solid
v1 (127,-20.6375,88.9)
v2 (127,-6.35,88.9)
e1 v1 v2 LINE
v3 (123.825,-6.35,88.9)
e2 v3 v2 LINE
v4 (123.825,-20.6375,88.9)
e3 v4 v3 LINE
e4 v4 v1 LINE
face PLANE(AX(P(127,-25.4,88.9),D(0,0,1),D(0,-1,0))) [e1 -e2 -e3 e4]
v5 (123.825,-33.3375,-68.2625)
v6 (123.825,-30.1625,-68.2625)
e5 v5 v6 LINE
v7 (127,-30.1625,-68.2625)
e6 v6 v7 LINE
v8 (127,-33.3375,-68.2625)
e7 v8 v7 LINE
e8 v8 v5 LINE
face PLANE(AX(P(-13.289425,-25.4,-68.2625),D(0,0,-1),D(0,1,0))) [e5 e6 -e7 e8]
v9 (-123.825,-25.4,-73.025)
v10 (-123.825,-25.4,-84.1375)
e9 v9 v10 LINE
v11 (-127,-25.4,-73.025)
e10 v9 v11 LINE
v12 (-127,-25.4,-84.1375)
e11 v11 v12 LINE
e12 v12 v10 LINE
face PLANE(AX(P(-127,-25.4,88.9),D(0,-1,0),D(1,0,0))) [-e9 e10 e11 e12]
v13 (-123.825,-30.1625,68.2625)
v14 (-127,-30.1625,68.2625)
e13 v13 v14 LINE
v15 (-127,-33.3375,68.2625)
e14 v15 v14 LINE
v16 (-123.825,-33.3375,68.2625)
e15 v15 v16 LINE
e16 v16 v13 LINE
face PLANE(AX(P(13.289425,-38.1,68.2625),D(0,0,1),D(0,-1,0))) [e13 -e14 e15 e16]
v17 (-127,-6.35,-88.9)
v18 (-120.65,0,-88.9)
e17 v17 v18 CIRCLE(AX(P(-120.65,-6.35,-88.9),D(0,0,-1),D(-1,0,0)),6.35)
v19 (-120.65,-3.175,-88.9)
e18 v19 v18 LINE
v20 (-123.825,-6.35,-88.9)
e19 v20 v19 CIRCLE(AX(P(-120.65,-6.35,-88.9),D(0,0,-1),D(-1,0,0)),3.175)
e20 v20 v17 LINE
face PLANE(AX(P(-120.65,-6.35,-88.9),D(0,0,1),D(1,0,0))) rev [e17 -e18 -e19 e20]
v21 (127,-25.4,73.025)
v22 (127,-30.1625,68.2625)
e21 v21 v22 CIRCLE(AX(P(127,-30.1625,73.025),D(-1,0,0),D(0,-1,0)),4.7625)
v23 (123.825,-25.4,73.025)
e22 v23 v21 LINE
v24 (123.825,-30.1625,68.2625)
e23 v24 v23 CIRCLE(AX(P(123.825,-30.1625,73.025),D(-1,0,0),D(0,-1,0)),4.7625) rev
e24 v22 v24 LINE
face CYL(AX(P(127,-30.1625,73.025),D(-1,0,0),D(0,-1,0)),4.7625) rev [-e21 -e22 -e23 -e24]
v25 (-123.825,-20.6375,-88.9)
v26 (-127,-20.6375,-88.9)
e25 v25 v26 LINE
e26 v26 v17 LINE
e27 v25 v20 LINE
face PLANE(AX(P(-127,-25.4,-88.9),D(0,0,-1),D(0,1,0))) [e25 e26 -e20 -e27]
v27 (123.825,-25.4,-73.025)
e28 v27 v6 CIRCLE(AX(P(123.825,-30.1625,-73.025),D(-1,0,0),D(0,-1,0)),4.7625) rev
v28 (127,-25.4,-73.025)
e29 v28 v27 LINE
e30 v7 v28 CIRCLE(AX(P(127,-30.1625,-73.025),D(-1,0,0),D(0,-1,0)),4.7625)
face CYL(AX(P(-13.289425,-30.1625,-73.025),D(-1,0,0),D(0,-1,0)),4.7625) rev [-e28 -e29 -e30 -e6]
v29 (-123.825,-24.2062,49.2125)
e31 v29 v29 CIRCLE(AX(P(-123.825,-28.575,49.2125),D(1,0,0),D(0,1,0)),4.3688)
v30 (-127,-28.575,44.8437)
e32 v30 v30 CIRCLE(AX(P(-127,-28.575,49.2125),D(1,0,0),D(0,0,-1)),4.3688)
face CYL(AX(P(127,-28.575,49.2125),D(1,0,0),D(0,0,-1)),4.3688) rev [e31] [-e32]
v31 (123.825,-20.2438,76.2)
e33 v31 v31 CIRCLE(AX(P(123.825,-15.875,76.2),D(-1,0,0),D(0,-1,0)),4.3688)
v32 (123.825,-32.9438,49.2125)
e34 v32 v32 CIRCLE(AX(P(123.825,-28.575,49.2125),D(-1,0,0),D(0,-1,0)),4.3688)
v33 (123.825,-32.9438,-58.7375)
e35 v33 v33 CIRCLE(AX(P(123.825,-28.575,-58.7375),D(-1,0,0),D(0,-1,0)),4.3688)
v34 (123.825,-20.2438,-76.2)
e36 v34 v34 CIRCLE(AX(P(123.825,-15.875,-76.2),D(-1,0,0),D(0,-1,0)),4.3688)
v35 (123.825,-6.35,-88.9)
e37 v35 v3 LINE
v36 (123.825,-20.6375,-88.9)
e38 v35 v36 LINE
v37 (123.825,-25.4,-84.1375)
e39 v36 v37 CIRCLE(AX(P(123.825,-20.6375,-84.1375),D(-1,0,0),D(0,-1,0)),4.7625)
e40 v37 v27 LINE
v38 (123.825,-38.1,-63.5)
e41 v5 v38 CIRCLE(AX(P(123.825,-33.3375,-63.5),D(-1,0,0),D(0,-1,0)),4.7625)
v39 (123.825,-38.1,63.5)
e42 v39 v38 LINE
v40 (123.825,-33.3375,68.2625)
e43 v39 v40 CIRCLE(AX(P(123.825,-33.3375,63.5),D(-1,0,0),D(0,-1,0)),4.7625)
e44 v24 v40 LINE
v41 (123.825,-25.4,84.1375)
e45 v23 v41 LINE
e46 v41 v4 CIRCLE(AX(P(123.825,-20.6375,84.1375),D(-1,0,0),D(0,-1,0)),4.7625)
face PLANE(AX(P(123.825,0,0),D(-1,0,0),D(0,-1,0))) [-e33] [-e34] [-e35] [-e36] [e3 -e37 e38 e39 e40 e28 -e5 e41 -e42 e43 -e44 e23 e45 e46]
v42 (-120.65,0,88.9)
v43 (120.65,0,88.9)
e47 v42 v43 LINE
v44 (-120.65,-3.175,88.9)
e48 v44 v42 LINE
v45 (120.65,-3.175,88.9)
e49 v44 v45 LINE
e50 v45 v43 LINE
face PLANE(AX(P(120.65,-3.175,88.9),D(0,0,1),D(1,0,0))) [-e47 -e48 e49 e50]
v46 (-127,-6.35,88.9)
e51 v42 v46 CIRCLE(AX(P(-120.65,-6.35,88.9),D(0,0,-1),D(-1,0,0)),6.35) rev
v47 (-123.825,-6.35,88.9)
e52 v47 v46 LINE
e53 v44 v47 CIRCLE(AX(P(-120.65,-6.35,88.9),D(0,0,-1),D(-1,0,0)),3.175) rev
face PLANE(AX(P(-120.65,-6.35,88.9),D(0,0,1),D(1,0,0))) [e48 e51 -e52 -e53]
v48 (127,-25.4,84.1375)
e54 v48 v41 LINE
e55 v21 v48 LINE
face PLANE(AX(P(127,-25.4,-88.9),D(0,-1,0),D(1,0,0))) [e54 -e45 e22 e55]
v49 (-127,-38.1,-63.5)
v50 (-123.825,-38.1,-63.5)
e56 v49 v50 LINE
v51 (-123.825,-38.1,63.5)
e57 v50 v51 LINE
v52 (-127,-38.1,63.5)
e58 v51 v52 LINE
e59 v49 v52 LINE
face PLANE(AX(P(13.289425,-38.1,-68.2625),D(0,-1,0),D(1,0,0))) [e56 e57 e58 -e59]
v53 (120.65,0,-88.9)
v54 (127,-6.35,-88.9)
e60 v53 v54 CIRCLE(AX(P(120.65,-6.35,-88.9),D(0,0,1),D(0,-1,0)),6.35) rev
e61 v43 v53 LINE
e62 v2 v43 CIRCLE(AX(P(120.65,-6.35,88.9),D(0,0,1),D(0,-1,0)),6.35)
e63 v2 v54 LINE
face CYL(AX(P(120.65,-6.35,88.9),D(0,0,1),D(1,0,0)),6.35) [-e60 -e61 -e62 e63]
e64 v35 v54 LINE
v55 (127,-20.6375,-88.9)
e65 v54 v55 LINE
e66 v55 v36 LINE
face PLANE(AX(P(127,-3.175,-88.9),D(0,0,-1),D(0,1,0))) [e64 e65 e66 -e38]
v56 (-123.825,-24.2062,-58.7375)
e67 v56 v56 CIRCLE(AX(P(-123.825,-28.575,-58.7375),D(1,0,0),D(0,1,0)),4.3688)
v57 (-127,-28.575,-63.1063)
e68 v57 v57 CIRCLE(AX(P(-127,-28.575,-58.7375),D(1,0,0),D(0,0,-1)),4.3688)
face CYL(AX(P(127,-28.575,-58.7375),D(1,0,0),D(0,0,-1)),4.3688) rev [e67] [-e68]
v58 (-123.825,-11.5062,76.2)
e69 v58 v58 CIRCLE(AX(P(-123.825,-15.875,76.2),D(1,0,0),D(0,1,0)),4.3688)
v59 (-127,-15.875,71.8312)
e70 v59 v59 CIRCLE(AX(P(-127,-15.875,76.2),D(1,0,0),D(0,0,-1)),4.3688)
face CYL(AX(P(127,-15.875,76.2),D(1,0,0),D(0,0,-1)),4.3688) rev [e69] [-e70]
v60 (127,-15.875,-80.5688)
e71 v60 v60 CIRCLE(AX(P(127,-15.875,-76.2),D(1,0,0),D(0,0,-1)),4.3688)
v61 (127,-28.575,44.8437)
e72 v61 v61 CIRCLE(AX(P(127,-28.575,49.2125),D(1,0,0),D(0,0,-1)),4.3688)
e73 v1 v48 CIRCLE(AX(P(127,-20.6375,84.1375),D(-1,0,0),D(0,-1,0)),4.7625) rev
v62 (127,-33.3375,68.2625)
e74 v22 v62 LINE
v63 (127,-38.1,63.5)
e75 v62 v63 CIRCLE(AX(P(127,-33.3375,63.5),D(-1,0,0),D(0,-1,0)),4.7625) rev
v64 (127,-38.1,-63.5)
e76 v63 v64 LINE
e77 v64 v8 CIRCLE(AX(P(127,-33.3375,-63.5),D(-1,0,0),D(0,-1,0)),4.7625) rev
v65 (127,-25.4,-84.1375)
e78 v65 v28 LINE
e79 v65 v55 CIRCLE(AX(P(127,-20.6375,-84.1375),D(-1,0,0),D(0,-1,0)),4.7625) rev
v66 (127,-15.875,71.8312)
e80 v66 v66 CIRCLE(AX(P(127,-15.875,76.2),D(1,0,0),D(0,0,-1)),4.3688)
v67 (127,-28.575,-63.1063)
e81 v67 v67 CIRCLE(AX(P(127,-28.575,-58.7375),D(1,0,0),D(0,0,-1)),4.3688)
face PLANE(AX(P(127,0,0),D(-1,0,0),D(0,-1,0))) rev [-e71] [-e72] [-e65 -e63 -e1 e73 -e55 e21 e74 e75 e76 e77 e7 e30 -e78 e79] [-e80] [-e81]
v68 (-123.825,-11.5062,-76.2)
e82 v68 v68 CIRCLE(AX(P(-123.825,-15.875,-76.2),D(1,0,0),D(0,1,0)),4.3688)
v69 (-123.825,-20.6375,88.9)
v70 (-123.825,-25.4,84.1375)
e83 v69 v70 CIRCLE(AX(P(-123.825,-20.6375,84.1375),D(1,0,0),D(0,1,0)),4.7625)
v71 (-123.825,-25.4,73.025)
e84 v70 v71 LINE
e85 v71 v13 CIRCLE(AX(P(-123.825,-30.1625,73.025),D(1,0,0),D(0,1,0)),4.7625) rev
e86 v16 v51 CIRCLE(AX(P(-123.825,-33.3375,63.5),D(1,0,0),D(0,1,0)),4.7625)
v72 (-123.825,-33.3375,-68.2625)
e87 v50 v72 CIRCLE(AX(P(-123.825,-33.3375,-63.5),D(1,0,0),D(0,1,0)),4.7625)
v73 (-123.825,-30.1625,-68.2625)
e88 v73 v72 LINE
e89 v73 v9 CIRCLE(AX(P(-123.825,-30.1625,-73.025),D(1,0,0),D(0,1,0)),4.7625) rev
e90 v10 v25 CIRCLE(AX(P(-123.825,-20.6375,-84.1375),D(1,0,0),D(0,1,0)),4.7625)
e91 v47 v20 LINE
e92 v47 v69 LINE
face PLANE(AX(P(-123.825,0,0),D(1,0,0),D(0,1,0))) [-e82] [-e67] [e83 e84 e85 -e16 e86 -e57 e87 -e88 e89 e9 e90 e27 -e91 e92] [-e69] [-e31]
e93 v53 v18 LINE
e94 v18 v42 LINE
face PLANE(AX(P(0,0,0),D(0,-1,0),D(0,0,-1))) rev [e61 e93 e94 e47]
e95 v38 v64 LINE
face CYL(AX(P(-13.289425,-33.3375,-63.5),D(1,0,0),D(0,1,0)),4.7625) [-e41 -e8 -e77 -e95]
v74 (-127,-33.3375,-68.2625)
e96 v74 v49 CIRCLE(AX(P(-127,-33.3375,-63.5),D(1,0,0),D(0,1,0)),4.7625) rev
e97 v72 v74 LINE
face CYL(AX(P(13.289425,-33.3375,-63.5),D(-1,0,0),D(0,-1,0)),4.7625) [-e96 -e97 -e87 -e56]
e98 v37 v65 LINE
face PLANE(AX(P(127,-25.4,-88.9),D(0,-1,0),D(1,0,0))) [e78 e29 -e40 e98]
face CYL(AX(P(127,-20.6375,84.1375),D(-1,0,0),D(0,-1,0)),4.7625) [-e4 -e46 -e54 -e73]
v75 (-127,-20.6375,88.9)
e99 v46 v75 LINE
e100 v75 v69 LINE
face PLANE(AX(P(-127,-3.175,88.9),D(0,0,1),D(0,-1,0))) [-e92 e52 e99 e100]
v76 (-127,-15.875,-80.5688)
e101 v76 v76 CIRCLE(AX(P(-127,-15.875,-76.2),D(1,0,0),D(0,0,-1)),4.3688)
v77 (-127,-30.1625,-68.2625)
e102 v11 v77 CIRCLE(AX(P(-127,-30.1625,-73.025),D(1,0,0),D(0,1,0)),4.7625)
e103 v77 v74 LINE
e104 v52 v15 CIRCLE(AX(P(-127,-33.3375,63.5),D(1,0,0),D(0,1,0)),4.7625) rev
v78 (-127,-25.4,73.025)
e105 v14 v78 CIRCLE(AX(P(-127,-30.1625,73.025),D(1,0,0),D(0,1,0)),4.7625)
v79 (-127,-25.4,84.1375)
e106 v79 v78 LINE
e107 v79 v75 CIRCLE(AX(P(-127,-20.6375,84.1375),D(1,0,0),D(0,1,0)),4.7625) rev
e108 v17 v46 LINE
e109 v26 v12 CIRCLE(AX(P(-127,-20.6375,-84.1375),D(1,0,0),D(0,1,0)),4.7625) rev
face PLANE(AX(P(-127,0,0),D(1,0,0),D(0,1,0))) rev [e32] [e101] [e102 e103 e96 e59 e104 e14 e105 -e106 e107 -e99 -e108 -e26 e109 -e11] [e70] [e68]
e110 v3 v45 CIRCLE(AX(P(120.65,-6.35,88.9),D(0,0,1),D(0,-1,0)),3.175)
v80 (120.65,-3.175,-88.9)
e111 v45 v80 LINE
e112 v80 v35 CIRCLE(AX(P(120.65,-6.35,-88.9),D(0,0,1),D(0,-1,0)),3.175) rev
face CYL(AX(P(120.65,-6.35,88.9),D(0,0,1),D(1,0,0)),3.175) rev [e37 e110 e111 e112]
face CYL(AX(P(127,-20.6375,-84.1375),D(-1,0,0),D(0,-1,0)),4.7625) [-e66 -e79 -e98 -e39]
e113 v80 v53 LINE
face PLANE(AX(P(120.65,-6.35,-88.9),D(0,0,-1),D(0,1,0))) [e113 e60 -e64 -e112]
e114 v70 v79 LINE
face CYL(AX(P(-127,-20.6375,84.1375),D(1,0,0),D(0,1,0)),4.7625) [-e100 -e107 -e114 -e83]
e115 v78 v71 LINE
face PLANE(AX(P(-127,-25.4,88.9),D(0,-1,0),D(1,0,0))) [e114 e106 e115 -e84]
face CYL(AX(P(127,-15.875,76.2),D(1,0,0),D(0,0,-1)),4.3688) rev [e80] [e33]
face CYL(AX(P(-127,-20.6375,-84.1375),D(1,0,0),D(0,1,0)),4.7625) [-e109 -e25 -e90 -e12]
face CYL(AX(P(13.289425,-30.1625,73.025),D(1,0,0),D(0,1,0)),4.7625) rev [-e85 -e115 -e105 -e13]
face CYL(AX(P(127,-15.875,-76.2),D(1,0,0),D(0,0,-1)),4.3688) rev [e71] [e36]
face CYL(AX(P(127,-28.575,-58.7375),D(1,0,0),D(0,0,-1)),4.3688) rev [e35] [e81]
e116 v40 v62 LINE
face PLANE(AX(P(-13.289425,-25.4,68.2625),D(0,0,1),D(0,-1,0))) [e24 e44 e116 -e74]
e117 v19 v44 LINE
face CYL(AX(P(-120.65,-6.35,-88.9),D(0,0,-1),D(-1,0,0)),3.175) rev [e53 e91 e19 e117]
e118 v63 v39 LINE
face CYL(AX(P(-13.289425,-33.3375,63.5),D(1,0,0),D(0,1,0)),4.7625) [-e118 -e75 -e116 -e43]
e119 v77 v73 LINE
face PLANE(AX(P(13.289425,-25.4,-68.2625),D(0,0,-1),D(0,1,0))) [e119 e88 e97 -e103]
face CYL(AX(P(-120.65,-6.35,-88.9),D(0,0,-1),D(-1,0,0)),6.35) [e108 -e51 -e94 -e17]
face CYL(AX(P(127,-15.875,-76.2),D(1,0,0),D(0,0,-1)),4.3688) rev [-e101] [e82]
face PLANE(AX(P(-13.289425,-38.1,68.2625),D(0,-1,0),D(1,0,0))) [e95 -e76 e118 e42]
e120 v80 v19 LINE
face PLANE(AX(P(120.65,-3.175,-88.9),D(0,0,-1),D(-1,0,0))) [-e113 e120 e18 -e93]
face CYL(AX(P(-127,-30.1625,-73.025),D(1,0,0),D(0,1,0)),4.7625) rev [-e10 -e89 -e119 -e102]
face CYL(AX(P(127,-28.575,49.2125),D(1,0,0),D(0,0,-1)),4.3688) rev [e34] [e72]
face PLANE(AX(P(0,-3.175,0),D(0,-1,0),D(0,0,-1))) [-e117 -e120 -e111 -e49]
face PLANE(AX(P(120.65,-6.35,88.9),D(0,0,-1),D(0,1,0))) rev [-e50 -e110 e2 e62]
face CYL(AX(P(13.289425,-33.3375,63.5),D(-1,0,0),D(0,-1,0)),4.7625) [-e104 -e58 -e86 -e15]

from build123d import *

# Parameters (mm, degrees)
SKETCH1_W                                 = 241.3
SKETCH1_H                                 = 177.8
BASE_FLANGE1_DEPTH                        = 3.175
EDGE_FLANGE1_DEPTH                        = 177.8
EDGE_FLANGE1_BEND_DEPTH                   = 177.8
SKETCH13_W                                = 136.525
SKETCH13_H                                = 12.7
BOSS_EXTRUDE1_DEPTH                       = 3.175
SKETCH39_W                                = 136.525
SKETCH39_H                                = 12.7
BOSS_EXTRUDE2_DEPTH                       = 3.175
HOLE_FOR_1_4_SELF_CLINCHING_NUTS_S_SS_C_D = 8.7376
FILLET2_R                                 = 4.7625


# Sheet-metal steps are written as plain solids
with BuildPart() as part:
    # Sketch1 → Base-Flange1 (new body)
    with BuildSketch(Plane(origin=(0, 0, 0), x_dir=(1, 0, 0), z_dir=(0, 1, 0))):
        Rectangle(SKETCH1_W, SKETCH1_H)
    extrude(amount=-BASE_FLANGE1_DEPTH)

    # Edge-Flange1 section (across the edge) → Edge-Flange1 (add)
    with BuildSketch(Plane(origin=(123.825, -3.175, -88.9), x_dir=(-1, 0, 0), z_dir=(0, 0, 1))):
        with BuildLine():
            Line((-3.175, 3.175), (-3.175, 22.225))
            Line((-3.175, 22.225), (0, 22.225))
            Line((0, 22.225), (0, 3.175))
            ThreePointArc((0, 3.175), (0.92993597, 0.92993597), (3.175, 0))
            Line((3.175, 0), (3.175, -3.175))
            ThreePointArc((3.175, -3.175), (-1.315128061, -1.315128061), (-3.175, 3.175))
        make_face()
    extrude(amount=EDGE_FLANGE1_DEPTH)

    # Edge-Flange1 section 2 (across the edge) → Edge-Flange1 bend (add)
    with BuildSketch(Plane(origin=(-123.825, -3.175, 88.9), x_dir=(1, 0, 0), z_dir=(0, 0, -1))):
        with BuildLine():
            Line((-3.175, 3.175), (-3.175, 22.225))
            Line((-3.175, 22.225), (0, 22.225))
            Line((0, 22.225), (0, 3.175))
            ThreePointArc((0, 3.175), (0.92993597, 0.92993597), (3.175, 0))
            Line((3.175, 0), (3.175, -3.175))
            ThreePointArc((3.175, -3.175), (-1.315128061, -1.315128061), (-3.175, 3.175))
        make_face()
    extrude(amount=EDGE_FLANGE1_BEND_DEPTH)

    # Sketch13 → Boss-Extrude1 (add)
    with BuildSketch(Plane(origin=(127, 0, 0), x_dir=(0, 0, -1), z_dir=(1, 0, 0))):
        with Locations((0, -31.75)):
            Rectangle(SKETCH13_W, SKETCH13_H)
    extrude(amount=-BOSS_EXTRUDE1_DEPTH)

    # Sketch39 → Boss-Extrude2 (add)
    with BuildSketch(Plane.ZY.offset(127)):
        with Locations((0, -31.75)):
            Rectangle(SKETCH39_W, SKETCH39_H)
    extrude(amount=-BOSS_EXTRUDE2_DEPTH)

    # Hole for 1/4 Self-clinching Nuts (S,SS,CLS,CLSS)1 (through all)
    with Locations(Plane(origin=(127, 0, 0), x_dir=(0, 0, -1), z_dir=(1, 0, 0))):
        with Locations((-76.2, -15.875), (76.2, -15.875), (58.7375, -28.575), (-49.2125, -28.575)):
            Hole(HOLE_FOR_1_4_SELF_CLINCHING_NUTS_S_SS_C_D / 2)

    # Fillet2
    fillet2_edges = [part.edges().sort_by_distance(p)[0] for p in [
        (125.4125, -25.4, -88.9),
        (125.4125, -25.4, 88.9),
        (-125.4125, -25.4, 88.9),
        (-125.4125, -25.4, -88.9),
        (125.4125, -38.1, -68.2625),
        (125.4125, -25.4, -68.2625),
        (125.4125, -25.4, 68.2625),
        (125.4125, -38.1, 68.2625),
        (-125.4125, -25.4, -68.2625),
        (-125.4125, -38.1, -68.2625),
        (-125.4125, -38.1, 68.2625),
        (-125.4125, -25.4, 68.2625),
    ]]
    fillet(fillet2_edges, radius=FILLET2_R)


solid = part.part
